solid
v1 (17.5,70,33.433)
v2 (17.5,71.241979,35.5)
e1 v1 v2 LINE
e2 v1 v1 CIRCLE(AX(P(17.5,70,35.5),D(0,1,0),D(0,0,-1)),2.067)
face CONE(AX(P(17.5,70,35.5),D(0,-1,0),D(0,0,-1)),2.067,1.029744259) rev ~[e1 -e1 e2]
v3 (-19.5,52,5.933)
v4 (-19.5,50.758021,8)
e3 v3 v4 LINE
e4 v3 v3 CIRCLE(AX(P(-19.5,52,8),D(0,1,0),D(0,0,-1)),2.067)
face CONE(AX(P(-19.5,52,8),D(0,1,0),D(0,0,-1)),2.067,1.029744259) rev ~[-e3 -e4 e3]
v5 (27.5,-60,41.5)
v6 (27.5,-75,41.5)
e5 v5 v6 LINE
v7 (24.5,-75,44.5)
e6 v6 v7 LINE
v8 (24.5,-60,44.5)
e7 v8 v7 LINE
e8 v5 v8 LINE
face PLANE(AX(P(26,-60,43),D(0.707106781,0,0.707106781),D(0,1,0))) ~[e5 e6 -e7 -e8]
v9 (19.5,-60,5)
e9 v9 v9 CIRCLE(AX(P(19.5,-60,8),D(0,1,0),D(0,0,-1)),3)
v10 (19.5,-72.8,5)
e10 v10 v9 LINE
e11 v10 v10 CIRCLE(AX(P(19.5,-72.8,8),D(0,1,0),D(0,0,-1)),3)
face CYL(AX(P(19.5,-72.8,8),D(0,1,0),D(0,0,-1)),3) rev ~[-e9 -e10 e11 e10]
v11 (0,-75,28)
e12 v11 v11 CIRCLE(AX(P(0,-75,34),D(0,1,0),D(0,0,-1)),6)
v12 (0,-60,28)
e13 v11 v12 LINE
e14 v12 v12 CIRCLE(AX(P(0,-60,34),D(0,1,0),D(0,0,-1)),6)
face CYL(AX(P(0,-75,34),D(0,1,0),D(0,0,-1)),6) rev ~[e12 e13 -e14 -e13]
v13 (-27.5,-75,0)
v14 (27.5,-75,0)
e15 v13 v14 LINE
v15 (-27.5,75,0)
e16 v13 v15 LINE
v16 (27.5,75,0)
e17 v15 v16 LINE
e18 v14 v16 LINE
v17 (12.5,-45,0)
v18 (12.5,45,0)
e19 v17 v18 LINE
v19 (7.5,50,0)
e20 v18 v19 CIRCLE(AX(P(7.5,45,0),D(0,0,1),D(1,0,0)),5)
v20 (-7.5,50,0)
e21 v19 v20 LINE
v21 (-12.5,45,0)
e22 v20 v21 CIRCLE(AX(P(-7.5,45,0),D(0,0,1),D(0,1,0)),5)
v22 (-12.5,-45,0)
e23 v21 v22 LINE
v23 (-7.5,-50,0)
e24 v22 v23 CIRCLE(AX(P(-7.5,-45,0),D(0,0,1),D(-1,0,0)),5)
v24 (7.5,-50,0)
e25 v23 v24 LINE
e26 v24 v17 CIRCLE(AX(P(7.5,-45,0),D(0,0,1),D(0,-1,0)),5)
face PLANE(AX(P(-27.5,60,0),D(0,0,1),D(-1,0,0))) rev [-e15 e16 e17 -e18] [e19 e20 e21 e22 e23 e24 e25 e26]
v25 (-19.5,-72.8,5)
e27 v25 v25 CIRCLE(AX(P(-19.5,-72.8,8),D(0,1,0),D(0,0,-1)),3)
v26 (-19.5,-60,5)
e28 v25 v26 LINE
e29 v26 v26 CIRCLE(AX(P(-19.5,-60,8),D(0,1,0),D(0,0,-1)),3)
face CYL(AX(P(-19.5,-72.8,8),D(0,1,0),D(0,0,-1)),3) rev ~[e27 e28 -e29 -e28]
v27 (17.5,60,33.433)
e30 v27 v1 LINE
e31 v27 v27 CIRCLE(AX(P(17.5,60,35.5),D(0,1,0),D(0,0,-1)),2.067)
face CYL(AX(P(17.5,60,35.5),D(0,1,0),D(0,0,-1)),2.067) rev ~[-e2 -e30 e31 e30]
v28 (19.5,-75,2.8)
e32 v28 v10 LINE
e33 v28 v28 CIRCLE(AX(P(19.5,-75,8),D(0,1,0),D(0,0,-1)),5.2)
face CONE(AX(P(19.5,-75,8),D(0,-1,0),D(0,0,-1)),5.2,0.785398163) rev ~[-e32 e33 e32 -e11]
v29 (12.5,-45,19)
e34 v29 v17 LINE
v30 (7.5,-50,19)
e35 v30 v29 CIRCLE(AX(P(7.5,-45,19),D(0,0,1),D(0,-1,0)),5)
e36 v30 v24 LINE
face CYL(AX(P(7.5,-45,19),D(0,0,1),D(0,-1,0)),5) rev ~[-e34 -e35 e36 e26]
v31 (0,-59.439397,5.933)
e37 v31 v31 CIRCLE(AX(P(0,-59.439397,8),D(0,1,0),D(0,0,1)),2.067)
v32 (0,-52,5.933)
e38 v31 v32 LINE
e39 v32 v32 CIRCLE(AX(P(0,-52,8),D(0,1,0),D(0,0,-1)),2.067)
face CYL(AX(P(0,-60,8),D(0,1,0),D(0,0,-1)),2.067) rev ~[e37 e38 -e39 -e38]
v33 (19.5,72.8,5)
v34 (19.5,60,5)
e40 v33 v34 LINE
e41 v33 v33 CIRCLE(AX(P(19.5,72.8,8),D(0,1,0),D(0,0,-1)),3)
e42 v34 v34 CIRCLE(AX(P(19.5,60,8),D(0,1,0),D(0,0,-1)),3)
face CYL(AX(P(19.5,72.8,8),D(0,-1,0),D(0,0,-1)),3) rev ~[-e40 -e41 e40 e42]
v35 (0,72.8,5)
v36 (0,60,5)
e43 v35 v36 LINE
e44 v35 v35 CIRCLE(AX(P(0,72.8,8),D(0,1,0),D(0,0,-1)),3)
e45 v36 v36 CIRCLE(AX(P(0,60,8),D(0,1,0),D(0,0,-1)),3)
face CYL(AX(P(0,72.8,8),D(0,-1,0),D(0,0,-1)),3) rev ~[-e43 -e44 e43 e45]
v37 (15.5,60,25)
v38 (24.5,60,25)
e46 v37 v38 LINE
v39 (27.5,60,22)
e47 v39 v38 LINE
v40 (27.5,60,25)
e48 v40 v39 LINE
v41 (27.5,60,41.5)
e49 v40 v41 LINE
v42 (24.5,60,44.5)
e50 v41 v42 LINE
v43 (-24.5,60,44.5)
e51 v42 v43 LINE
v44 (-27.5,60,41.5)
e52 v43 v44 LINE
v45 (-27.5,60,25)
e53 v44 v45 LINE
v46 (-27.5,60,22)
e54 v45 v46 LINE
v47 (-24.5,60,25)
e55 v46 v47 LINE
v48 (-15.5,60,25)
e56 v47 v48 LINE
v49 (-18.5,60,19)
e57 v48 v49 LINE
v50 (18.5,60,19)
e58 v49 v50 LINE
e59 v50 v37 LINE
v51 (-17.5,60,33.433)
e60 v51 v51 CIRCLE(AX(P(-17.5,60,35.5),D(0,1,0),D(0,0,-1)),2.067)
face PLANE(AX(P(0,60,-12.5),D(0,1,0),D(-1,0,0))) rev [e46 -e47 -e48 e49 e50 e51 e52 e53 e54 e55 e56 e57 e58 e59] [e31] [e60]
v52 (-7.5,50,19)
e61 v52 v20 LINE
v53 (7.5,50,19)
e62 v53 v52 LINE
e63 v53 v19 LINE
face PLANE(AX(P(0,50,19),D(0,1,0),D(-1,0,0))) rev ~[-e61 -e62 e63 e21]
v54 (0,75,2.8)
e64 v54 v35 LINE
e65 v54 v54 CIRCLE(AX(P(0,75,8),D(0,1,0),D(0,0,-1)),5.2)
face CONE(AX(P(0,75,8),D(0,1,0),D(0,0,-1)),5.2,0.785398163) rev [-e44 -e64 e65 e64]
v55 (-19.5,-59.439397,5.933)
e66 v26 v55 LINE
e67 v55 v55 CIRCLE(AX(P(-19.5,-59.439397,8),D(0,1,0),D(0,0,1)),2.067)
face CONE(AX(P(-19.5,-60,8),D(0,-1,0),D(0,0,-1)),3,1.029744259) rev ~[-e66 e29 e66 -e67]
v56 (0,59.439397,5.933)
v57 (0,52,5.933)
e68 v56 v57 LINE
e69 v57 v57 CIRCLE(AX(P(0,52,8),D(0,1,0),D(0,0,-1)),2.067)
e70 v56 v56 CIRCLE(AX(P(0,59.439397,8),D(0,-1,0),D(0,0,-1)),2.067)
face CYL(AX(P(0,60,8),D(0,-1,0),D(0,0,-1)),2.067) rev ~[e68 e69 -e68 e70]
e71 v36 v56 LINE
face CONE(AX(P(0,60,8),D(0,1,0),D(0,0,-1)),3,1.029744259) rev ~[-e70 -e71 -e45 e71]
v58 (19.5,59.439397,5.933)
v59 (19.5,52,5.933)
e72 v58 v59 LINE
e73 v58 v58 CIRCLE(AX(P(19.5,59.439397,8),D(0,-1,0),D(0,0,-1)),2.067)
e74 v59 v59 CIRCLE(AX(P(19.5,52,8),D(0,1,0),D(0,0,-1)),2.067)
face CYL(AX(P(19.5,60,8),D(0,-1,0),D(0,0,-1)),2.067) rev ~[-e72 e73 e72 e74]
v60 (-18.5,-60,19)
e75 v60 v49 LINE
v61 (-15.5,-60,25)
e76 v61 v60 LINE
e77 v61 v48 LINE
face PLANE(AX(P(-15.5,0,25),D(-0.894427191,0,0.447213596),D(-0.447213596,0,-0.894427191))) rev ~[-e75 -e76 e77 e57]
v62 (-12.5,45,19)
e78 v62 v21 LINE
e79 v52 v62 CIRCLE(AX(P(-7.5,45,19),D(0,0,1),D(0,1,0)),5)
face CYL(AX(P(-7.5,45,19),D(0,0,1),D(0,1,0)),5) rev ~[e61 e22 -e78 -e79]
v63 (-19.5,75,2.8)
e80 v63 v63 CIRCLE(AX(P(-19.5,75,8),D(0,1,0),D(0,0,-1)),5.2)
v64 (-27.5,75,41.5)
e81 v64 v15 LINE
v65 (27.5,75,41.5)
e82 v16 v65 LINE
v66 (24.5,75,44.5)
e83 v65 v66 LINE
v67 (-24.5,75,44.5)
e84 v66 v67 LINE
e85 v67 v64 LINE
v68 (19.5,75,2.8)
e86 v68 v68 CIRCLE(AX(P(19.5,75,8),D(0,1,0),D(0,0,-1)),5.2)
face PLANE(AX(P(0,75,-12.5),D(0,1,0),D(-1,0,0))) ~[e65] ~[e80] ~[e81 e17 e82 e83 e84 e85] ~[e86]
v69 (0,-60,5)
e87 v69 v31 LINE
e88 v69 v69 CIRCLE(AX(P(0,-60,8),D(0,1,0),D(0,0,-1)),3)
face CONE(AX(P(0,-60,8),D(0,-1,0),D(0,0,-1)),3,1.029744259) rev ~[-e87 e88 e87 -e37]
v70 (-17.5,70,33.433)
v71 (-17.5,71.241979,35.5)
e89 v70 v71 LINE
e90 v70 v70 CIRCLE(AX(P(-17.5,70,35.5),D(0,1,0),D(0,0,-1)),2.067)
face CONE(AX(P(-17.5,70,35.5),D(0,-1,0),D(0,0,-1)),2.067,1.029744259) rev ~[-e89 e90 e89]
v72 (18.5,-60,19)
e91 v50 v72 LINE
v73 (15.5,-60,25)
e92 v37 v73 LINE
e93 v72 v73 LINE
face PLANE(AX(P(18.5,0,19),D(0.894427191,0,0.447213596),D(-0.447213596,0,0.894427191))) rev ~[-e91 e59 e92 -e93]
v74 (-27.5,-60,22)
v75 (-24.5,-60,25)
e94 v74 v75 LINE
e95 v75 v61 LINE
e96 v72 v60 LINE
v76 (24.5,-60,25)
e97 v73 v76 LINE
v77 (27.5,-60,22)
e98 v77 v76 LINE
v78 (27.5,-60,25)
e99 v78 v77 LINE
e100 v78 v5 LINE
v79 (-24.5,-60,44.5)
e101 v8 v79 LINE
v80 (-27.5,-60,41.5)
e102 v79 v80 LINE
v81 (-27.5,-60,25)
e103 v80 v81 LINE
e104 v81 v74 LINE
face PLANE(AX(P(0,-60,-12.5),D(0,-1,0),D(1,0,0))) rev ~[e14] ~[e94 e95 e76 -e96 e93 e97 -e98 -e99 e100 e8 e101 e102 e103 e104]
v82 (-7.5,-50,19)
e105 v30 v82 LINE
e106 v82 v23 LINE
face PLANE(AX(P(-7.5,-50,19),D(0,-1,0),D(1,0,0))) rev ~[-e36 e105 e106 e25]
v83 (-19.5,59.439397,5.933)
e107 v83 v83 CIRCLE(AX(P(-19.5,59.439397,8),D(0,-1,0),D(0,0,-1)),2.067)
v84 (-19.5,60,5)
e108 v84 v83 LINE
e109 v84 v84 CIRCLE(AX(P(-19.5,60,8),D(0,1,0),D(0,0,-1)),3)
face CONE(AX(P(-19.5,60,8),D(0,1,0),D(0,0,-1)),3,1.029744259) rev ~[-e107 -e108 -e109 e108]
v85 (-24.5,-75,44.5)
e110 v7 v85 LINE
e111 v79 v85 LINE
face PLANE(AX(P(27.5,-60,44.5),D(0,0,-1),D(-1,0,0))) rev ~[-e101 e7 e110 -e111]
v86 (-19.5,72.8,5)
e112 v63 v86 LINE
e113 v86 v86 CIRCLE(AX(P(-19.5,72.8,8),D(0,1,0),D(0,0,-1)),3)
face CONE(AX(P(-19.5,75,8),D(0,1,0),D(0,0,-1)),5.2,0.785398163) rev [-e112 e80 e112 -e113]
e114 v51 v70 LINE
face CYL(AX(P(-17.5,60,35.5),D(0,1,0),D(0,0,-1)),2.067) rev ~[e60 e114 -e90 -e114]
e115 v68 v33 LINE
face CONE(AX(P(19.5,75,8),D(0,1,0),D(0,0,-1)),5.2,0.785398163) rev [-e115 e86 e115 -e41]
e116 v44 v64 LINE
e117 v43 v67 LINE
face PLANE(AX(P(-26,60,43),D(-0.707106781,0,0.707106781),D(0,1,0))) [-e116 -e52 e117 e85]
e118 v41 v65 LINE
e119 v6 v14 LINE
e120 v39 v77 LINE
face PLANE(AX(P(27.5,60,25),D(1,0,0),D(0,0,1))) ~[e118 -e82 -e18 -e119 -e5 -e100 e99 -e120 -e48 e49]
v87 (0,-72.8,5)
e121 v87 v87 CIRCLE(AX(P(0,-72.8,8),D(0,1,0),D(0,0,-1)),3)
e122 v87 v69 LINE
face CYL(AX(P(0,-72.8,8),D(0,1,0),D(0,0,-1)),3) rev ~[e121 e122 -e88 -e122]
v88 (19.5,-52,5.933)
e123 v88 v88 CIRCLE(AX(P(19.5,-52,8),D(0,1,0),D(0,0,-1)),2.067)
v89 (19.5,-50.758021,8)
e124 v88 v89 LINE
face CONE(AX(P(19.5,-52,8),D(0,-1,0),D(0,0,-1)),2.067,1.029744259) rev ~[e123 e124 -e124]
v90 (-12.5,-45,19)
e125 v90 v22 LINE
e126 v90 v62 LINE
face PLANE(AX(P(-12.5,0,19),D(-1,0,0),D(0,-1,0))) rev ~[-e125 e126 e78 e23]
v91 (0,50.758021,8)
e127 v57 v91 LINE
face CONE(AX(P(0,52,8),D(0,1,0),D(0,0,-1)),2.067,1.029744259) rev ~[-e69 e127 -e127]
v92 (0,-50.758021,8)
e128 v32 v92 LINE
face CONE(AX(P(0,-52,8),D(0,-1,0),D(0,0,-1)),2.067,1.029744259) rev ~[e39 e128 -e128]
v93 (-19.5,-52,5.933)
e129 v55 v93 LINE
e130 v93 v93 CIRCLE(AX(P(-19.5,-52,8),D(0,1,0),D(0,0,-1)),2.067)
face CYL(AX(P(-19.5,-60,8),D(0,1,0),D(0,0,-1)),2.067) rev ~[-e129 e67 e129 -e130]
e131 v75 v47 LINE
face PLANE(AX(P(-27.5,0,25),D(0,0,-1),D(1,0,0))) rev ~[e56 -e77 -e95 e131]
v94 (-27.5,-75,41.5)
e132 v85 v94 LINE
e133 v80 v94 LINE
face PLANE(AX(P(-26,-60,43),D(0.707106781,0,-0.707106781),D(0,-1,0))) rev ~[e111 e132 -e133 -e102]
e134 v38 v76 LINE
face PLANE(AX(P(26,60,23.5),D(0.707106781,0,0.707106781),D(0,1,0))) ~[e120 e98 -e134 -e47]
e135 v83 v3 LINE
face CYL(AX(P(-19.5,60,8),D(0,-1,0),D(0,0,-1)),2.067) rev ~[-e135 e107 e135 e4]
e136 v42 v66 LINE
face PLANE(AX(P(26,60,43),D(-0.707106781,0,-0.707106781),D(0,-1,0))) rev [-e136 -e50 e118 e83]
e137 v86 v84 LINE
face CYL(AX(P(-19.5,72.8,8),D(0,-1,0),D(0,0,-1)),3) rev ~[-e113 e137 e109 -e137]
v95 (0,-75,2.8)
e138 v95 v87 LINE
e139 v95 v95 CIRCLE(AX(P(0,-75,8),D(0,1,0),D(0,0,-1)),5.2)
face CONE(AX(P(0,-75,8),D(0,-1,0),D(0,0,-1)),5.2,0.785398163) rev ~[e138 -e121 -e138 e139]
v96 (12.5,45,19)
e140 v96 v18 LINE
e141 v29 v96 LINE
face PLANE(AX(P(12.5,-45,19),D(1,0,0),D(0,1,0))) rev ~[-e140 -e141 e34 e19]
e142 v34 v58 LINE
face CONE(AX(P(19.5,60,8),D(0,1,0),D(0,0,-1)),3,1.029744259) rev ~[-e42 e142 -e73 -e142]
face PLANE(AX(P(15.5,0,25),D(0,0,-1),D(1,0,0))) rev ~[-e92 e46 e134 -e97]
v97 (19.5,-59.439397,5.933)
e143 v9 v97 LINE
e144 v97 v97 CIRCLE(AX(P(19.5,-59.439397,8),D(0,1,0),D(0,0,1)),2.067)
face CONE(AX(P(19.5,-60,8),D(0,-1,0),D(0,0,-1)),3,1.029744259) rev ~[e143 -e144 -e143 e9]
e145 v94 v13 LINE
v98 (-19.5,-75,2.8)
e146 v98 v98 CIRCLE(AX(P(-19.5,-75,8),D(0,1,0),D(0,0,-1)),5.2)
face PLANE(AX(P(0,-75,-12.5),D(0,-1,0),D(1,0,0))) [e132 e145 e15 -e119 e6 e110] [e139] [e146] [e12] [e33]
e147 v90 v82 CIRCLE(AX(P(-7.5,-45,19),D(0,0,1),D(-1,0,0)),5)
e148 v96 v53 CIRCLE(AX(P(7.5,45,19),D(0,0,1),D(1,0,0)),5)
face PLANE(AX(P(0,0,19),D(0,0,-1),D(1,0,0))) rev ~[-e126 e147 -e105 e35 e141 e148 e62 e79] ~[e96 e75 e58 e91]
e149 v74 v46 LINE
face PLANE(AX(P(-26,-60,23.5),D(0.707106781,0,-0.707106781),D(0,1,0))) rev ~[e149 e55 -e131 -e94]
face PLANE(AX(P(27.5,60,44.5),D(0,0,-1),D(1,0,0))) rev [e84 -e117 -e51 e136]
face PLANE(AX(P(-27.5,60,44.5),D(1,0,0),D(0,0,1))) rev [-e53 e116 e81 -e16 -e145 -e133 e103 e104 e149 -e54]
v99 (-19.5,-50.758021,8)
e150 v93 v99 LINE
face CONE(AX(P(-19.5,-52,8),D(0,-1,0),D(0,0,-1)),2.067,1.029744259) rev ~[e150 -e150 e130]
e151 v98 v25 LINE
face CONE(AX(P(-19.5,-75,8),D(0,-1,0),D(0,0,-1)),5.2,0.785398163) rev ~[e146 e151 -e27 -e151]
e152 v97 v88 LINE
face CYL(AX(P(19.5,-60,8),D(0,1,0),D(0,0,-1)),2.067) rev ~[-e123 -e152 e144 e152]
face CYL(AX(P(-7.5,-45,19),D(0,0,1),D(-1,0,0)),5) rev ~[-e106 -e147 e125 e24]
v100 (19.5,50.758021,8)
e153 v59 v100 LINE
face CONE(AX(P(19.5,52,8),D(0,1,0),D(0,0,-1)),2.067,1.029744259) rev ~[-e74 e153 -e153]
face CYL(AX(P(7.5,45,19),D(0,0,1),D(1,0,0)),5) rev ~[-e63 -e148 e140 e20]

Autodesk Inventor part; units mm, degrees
ref_plane "YZ Plane" through (0, 0, 0) normal (1, 0, 0) x (0, 1, 0)
ref_plane "XZ Plane" through (0, 0, 0) normal (0, 1, 0) x (-1, 0, 0)
ref_plane "XY Plane" through (0, 0, 0) normal (0, 0, 1) x (1, 0, 0)
sketch "Sketch1" plane through (0, 0, -12.5) normal (0, 1, 0) x (-1, 0, 0)
  line L0 (-27.5, 12.5) -> (27.5, 12.5)
  line L1 (27.5, 12.5) -> (27.5, 37.5)
  line L2 (27.5, 37.5) -> (15.5, 37.5)
  line L3 (15.5, 37.5) -> (18.5, 31.5)
  line L4 (18.5, 31.5) -> (-18.5, 31.5)
  line L5 (-18.5, 31.5) -> (-15.5, 37.5)
  line L6 (-15.5, 37.5) -> (-27.5, 37.5)
  line L7 (-27.5, 37.5) -> (-27.5, 12.5)
  line L8 (0, 7.5) -> (0, 42.5) projected
  line L9 (-38.5, 12.5) -> (38.5, 12.5) projected
  point P0 (0, 12.5)
  point P1 (0, 12.5)
  dimension "Base_Width" = 55
  dimension "Base_Height" = 25
  dimension "Slider_Shelf" = 12
  dimension "d3" = 9
  dimension "d2" = 6
extrude "Extrusion1" add sketch "Sketch1" along normal mid plane 120
sketch "Sketch4" plane through (-18.5, 60, 19) normal (0, 0, 1) x (1, 0, 0)
  line L0 (11, -110) -> (26, -110)
  line L1 (31, -105) -> (31, -15)
  line L2 (26, -10) -> (11, -10)
  line L3 (6, -15) -> (6, -105)
  arc A0 (6, -105) -> (11, -110) centre (11, -105) ccw
  arc A1 (26, -110) -> (31, -105) centre (26, -105) ccw
  arc A2 (31, -15) -> (26, -10) centre (26, -15) ccw
  arc A3 (11, -10) -> (6, -15) centre (11, -15) ccw
  line L4 (-20, -60) -> (57, -60) projected
  line L5 (18.5, 24) -> (18.5, -144) projected
  line L6 (-9, -120) -> (-9, 0) projected
  line L7 (37, 0) -> (0, 0) projected
  dimension "StopPlate_DP" = 5
  dimension "d25" = 100
  dimension "d26" = 25
extrude "Extrusion2" cut sketch "Sketch4" against normal through all
sketch "Sketch6" plane through (0, -60, -12.5) normal (0, -1, 0) x (1, 0, 0)
  line L0 (27.5, 37.5) -> (27.5, 12.5) projected
  line L1 (-27.5, 12.5) -> (27.5, 12.5)
  line L2 (27.5, 12.5) -> (27.5, 57)
  line L3 (27.5, 57) -> (-27.5, 57)
  line L4 (-27.5, 57) -> (-27.5, 12.5)
  point P0 (0, 12.5)
  dimension "EndBlock_HT" = 44.5
extrude "Extrusion4" add sketch "Sketch6" along normal blind 15
mirror "Mirror1" about plane through (0, 0, 0) normal (0, 1, 0) of "Extrusion4"
sketch "Sketch7" plane through (0, -75, -12.5) normal (0, -1, 0) x (1, 0, 0)
  line L0 (-27.5, 57) -> (27.5, 57) projected
  line L1 (0, 65.9) -> (0, 3.6) projected
  point P0 (0, 12.5)
  point P1 (0, 46.5)
  dimension "d39" = 10.5
hole "Hole1" at (0, -75, 34) direction (0, 1, 0) diameter 12 depth 75
sketch "Sketch14" plane through (0, -75, -12.5) normal (0, -1, 0) x (1, 0, 0)
  line L0 (27.5, 12.5) -> (-27.5, 12.5) projected
  line L1 (0, 65.9) -> (0, 3.6) projected
  point P0 (0, 12.5)
  point P1 (0, 20.5)
  dimension "d83" = 8
hole "Hole5" at (0, -75, 8) direction (0, 1, 0) diameter 6 depth 15 tip angle 118 countersink diameter 10.4 countersink angle 90
sketch "Sketch9" plane through (0, -60, -12.5) normal (0, -1, 0) x (1, 0, 0)
  circle A0 centre (0, 20.5) radius 5.2 projected
  point P0 (0, 12.5)
hole "Hole3" at (0, -60, 8) direction (0, 1, 0) diameter 4.134 depth 8 tip angle 118 thread size "M5x0.8" class "6H" standard "ANSI Metric M Profile"
pattern_linear "Rectangular Pattern2" count 3 spacing 19.5 along (-1, 0, 0) of "Hole3", "Hole5" first direction both ways yes
mirror "Mirror2" about plane through (0, 0, 0) normal (0, 1, 0) of "Hole3", "Rectangular Pattern2", "Hole5"
sketch "Sketch11" plane through (-27.5, 60, 44.5) normal (0, -1, 0) x (1, 0, 0)
  line L0 (0, 0) -> (55, 0) projected
  line L1 (0, -44.5) -> (0, 0) projected
  line L2 (55, 0) -> (55, -44.5) projected
  point P0 (27.5, -44.5)
  point P1 (10, -9)
  point P2 (45, -9)
  dimension "d103" = 9
  dimension "d104" = 10
  dimension "d105" = 10
hole "Hole6" at (-17.5, 60, 35.5) at (17.5, 60, 35.5) direction (0, 1, 0) diameter 4.134 depth 10 tip angle 118 thread size "M5x0.8" class "6H" standard "ANSI Metric M Profile"
thread "Thread1" size "M12x1.75" class "6H" standard "ANSI Metric M Profile" full length
chamfer "Chamfer1" distance 3 angle 45 6 edges at (-27.5, -67.5, 44.5) (27.5, -67.5, 44.5) (27.5, 67.5, 44.5) (-27.5, 67.5, 44.5) (27.5, 0, 25) (-27.5, 0, 25)
equation "\"d89\" = EndBlock_DP"
equation "\"d104\" = d105"
equation "\"EndBlock_DP\" = 15"
properties part number "Base"
